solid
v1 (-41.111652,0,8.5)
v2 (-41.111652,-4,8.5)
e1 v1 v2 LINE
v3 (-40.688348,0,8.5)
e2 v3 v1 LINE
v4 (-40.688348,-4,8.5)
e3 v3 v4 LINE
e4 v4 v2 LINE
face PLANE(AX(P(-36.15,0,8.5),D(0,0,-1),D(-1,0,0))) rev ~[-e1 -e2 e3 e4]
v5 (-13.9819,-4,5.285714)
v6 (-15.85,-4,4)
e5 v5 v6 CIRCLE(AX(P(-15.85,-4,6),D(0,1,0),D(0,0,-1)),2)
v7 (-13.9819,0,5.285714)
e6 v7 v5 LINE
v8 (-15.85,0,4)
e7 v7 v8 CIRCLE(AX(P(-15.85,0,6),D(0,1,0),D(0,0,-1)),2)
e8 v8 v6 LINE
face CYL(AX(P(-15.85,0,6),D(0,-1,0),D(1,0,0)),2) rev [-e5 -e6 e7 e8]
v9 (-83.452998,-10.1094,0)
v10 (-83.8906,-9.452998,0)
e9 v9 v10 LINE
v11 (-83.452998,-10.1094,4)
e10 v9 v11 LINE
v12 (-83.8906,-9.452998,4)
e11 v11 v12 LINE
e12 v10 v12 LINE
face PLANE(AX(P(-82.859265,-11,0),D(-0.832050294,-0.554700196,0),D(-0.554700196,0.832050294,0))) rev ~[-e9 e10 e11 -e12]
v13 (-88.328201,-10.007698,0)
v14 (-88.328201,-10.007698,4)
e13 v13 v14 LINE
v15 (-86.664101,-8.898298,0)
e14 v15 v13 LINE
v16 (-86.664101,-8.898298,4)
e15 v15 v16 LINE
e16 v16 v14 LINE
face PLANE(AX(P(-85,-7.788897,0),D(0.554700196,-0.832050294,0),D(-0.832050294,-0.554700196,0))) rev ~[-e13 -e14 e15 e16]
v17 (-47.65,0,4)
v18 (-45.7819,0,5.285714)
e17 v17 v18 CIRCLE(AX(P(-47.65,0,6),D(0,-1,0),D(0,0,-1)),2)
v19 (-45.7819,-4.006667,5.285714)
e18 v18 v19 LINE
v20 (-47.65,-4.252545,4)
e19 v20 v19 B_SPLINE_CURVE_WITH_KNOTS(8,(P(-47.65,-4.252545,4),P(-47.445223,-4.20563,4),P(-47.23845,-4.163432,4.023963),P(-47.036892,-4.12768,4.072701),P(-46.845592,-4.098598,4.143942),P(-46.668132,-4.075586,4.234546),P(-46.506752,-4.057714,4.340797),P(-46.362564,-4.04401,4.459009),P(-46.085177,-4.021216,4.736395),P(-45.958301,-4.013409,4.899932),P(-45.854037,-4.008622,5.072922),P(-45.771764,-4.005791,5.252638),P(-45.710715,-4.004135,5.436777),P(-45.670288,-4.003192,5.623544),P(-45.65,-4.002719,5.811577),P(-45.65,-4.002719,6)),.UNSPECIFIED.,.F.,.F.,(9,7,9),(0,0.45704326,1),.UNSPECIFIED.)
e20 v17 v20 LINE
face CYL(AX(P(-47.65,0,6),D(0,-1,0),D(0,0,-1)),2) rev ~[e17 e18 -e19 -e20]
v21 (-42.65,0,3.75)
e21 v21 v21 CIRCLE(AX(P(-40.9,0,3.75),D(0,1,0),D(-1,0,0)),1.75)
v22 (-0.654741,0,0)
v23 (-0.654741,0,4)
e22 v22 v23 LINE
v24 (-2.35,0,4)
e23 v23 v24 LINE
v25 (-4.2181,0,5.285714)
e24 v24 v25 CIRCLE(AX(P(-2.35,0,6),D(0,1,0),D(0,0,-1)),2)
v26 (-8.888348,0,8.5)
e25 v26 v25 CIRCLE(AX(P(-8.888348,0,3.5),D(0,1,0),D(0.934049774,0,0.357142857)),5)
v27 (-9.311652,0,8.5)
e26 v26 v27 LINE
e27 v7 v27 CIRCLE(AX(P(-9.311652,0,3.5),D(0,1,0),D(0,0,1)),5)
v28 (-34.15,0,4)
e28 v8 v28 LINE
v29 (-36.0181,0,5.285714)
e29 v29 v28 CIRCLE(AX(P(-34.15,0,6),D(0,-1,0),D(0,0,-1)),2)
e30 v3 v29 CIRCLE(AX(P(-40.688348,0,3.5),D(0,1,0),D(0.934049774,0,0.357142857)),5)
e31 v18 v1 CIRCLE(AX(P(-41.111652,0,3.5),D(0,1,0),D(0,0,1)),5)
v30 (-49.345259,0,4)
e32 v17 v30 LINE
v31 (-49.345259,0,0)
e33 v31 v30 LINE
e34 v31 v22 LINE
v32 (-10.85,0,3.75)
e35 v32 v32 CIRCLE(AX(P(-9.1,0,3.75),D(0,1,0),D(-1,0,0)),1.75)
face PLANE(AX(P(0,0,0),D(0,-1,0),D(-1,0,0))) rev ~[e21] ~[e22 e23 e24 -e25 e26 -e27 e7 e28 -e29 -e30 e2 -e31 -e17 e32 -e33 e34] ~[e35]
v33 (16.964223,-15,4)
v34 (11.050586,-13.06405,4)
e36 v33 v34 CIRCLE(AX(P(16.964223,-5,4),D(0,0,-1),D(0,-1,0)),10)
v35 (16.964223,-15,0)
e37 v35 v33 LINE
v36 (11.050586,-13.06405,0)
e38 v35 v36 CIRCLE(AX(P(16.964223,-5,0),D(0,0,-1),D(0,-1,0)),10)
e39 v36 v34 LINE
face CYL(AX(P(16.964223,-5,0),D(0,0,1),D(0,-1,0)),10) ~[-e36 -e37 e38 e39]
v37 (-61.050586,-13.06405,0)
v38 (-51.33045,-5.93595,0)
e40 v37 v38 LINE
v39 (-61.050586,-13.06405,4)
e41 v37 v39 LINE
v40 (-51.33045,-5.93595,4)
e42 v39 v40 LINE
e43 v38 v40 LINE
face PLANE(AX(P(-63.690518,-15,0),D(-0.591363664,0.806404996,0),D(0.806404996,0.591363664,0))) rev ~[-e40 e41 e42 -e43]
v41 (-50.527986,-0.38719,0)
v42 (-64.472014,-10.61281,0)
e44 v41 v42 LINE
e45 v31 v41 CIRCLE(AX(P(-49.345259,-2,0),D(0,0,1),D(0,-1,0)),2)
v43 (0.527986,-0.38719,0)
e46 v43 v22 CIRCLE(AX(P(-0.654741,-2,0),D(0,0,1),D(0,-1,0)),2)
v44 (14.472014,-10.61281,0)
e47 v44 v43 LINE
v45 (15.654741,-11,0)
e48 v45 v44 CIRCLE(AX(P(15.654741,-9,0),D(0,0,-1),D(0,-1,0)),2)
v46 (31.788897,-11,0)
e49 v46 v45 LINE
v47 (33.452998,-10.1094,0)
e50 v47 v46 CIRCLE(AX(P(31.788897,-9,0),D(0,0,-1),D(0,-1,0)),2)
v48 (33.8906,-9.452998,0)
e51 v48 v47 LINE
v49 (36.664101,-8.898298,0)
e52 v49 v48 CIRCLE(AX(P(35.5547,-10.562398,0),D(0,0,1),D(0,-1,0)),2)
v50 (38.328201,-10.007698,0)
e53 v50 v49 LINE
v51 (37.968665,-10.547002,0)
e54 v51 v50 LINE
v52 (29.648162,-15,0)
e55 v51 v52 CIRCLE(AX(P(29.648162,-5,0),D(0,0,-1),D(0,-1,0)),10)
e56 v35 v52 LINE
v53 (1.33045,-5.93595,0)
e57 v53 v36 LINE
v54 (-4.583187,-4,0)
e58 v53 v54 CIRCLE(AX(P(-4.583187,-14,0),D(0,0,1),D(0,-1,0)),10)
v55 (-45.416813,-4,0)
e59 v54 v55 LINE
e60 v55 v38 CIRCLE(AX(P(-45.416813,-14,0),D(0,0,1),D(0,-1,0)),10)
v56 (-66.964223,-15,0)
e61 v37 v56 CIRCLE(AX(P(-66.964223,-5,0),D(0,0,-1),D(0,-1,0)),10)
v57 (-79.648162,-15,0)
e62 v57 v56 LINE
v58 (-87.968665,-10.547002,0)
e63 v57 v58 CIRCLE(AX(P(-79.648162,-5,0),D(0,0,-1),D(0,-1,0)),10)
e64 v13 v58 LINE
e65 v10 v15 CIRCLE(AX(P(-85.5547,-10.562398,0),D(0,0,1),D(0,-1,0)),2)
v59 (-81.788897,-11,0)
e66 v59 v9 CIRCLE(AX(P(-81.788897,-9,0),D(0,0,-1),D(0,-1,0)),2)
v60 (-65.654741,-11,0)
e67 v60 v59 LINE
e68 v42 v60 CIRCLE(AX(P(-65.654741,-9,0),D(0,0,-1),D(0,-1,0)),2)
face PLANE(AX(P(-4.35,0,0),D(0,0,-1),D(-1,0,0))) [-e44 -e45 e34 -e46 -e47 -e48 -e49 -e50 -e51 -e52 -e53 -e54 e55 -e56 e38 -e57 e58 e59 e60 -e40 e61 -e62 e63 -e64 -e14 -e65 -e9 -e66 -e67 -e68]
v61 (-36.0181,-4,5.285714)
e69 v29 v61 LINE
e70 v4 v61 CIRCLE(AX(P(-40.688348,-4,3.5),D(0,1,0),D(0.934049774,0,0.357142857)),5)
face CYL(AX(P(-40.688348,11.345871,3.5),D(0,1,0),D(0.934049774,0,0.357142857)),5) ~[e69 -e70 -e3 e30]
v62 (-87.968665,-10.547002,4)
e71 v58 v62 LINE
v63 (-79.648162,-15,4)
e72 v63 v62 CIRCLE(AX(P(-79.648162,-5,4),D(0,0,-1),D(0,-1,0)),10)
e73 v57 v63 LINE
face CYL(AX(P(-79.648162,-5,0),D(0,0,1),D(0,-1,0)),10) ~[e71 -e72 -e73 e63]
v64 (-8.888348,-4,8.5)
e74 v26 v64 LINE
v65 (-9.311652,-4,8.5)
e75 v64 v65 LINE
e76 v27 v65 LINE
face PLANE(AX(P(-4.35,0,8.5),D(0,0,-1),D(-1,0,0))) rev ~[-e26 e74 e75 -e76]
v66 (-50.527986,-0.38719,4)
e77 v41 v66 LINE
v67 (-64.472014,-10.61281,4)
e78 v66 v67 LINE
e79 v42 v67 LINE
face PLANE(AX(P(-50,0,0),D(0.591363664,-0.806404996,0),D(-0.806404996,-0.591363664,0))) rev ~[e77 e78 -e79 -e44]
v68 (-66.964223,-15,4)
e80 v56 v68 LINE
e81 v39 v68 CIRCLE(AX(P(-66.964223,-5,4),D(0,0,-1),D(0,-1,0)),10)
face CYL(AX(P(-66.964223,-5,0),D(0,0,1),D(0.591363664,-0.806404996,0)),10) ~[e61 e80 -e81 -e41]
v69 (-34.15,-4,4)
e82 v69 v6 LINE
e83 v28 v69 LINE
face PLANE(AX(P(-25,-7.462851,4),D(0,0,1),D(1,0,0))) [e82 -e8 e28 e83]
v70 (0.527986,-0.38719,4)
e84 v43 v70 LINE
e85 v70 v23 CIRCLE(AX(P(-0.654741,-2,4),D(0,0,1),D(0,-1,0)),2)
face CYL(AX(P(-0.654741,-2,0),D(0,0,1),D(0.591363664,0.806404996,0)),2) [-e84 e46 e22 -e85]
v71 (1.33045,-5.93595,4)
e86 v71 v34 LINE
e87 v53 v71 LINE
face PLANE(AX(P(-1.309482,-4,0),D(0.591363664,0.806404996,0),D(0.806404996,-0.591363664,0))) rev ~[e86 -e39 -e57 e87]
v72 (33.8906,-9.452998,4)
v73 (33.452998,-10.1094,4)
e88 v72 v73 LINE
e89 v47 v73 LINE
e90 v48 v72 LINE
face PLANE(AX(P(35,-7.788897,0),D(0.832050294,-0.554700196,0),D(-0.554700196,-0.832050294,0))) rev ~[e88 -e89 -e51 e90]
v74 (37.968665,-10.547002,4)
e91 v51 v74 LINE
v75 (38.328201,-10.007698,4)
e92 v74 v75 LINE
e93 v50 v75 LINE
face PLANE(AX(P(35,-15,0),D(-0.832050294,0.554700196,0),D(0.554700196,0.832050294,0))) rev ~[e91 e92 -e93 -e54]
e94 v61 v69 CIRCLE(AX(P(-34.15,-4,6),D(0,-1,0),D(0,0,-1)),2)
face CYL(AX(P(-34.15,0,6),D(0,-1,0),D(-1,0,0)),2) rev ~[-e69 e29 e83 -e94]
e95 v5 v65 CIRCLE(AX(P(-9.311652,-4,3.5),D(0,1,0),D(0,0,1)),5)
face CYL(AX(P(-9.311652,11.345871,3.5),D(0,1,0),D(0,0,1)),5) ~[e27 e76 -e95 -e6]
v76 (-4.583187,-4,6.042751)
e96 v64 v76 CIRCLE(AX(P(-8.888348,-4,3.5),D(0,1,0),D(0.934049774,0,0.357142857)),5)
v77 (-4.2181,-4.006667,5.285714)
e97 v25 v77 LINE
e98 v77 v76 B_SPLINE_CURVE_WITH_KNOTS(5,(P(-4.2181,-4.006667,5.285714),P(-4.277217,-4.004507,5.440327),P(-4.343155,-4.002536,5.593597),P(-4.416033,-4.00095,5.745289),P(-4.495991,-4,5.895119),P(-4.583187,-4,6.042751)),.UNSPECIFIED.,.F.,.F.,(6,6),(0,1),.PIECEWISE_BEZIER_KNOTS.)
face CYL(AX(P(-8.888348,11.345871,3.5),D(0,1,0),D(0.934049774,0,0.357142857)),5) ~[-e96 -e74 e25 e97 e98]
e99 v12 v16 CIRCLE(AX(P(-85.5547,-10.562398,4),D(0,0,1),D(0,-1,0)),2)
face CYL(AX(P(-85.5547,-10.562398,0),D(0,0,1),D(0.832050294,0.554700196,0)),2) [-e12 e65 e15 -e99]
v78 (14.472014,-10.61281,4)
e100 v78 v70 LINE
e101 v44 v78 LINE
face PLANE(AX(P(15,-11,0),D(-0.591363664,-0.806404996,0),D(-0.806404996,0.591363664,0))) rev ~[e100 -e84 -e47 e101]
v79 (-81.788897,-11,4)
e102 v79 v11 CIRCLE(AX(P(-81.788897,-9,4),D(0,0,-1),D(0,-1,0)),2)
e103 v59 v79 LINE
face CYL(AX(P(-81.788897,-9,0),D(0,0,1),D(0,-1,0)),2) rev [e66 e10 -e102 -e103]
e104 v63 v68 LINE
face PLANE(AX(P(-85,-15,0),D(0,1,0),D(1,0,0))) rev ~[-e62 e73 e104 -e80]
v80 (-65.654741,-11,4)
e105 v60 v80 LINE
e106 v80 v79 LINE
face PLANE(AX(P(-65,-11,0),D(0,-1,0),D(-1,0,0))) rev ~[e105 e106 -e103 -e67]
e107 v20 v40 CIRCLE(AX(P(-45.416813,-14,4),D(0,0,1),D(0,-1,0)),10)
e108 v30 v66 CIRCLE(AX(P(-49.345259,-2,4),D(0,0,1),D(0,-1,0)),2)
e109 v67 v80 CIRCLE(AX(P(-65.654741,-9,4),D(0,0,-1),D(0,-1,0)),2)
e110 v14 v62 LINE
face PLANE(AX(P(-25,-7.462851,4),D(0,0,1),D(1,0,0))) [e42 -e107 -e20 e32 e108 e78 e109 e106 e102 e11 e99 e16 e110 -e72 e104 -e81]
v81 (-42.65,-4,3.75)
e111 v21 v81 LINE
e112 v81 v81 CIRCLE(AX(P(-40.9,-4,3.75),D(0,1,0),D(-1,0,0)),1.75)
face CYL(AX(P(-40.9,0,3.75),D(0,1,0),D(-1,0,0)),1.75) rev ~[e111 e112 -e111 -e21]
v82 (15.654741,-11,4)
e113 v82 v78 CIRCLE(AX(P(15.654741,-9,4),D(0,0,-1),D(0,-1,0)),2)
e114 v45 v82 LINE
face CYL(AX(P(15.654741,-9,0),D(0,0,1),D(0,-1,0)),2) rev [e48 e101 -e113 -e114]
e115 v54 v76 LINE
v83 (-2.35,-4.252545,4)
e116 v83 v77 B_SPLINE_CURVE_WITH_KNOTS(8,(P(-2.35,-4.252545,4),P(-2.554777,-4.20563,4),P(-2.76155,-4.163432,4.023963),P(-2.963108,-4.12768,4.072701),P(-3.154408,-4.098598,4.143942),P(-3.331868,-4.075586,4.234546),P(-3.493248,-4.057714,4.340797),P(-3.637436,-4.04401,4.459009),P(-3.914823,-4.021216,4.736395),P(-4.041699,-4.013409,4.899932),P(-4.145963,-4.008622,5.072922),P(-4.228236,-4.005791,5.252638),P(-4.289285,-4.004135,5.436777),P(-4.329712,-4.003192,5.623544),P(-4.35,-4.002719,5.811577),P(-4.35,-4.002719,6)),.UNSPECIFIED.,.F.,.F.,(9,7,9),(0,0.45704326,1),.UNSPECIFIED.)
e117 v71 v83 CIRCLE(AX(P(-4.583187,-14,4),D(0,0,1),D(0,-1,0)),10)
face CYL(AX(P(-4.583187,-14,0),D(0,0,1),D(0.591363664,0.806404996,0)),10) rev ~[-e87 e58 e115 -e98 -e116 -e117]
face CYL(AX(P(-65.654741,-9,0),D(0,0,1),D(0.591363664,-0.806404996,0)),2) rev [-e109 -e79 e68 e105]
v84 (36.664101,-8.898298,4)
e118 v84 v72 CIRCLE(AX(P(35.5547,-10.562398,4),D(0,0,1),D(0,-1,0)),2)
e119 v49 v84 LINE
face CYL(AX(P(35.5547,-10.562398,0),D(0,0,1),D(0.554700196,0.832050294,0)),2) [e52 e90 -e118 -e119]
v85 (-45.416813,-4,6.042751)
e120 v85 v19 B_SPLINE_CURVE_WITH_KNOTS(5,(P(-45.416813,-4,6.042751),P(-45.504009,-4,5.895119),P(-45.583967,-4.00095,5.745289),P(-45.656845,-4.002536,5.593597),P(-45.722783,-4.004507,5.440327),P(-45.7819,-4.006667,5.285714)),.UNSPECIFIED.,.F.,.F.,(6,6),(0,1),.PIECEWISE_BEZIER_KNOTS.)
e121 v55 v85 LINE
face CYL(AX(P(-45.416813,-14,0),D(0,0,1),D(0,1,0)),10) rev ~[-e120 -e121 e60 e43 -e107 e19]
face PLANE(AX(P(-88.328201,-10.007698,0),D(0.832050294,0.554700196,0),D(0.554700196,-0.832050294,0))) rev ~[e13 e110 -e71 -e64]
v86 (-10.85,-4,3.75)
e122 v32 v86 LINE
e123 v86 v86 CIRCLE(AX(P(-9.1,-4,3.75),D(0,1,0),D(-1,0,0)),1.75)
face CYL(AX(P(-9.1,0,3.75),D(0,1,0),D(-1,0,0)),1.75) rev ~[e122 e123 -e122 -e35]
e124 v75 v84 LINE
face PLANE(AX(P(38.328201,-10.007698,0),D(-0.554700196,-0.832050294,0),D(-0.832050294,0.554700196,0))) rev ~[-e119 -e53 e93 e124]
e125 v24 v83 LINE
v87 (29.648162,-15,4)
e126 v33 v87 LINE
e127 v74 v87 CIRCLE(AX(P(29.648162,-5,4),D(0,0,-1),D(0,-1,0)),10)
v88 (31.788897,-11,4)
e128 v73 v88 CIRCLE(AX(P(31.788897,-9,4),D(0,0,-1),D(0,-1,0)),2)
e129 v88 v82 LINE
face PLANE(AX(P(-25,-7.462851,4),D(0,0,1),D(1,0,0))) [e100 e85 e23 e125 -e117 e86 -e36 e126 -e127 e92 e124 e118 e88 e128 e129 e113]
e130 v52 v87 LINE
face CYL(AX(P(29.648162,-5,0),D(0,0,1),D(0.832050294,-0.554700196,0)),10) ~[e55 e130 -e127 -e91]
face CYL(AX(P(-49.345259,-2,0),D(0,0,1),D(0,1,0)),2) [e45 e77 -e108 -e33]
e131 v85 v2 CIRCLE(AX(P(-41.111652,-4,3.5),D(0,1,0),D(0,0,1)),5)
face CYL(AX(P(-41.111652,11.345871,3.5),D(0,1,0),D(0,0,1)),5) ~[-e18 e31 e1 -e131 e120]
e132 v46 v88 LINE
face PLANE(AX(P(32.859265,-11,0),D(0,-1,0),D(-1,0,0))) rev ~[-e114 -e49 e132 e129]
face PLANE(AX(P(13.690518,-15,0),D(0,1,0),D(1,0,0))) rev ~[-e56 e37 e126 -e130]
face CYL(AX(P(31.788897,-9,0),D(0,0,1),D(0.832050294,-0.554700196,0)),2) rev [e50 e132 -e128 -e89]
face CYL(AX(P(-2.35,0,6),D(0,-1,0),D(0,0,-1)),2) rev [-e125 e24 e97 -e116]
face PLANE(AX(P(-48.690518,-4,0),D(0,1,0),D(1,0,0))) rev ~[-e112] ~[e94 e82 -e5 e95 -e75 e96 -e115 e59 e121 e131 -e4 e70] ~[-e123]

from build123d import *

# Parameters (mm, degrees)
F1_DEPTH    = 4
F2_W        = 9.5
F2_H        = 8.5
F3_DEPTH    = 4
F4_R        = 1.75
F5_DEPTH    = 154
F6_R        = 10
F7_R        = 2
F8_R        = 2
F9_T1_DEPTH = 26.6944612474
F9_T3_DEPTH = 26.6917420766


# Not quite as in the source:
# - a fillet or chamfer that OpenCascade refuses, or shapes differently, is made with other operations: its cross-section is extruded or revolved along the edge and cut away or added
# - an extrude ends at something that could not be found from the text; its depth is read off the source's solid


with BuildPart() as f1:
    # F0 (on Top) → F1 (new body)
    with BuildSketch(Plane.XY):
        Polygon((-82.859264966, -11), (-85, -7.7888974491), (-88.3282011774, -10.007698234), (-85, -15), (-63.6905180954, -15), (-48.6905180954, -4), (-1.3094819046, -4), (13.6905180954, -15), (35, -15), (38.3282011774, -10.007698234), (35, -7.7888974491), (32.859264966, -11), (15, -11), (0, 0), (-50, 0), (-65, -11), align=None)
    extrude(amount=F1_DEPTH)

    # F2 (on face) → F3 (join, through all)
    with BuildSketch(Plane(origin=(0, 0, 0), x_dir=(-1, 0, 0), z_dir=(0, 1, 0))):
        with Locations((9.1, 4.25)):
            Rectangle(F2_W, F2_H)
        with Locations((40.9, 4.25)):
            Rectangle(F2_W, F2_H)
    extrude(amount=-F3_DEPTH)

    # F4 (on face) → F5 (cut, through all)
    with BuildSketch(Plane(origin=(0, 0, 0), x_dir=(-1, 0, 0), z_dir=(0, 1, 0))):
        with Locations((9.1, 3.75)):
            Circle(F4_R)
        with Locations((40.9, 3.75)):
            Circle(F4_R)
    extrude(amount=-F5_DEPTH, mode=Mode.SUBTRACT)

    # F6
    f6_edges = [f1.edges().sort_by_distance(p)[0] for p in [
        (35, -15, 2),
        (13.690518, -15, 2),
        (-63.690518, -15, 2),
        (-85, -15, 2),
        (-48.690518, -4, 2),
        (-1.309482, -4, 2),
    ]]
    fillet(f6_edges, radius=F6_R)

    # F7
    f7_edges = [f1.edges().sort_by_distance(p)[0] for p in [
        (35, -7.788897, 2),
        (-85, -7.788897, 2),
        (-65, -11, 2),
        (-82.859265, -11, 2),
        (32.859265, -11, 2),
        (15, -11, 2),
        (0, 0, 2),
        (-50, 0, 2),
    ]]
    fillet(f7_edges, radius=F7_R)

    # F8
    f8_edges = [f1.edges().sort_by_distance(p)[0] for p in [
        (-45.65, -2.00136, 4),
        (-13.85, -2, 4),
        (-4.35, -2.00136, 4),
        (-36.15, -2, 4),
    ]]
    fillet(f8_edges, radius=F8_R)

    # F9: fillet of radius 5 on 4 edges, made by hand

    # F9_s2 → F9_t1 (cut)
    with BuildSketch(Plane.XZ.offset(-11.3458710383)):
        with BuildLine():
            ThreePointArc((-41.1116515847, 8.5), (-43.9463851322, 7.6187723552), (-45.7819004528, 5.2857142857))
            Line((-45.7819004528, 5.2857142857), (-46.2489253396, 5.4642857143))
            ThreePointArc((-46.2489253396, 5.4642857143), (-46.15, 6), (-46.15, 8.5))
            Line((-46.15, 8.5), (-45.65, 9))
            Line((-45.65, 9), (-41.1116515847, 9))
            Line((-41.1116515847, 9), (-41.1116515847, 8.5))
        make_face()
        with BuildLine():
            ThreePointArc((-4.2180995472, 5.2857142857), (-6.0536148677, 7.6187723552), (-8.8883484153, 8.5))
            Line((-8.8883484153, 8.5), (-8.8883484153, 9))
            Line((-8.8883484153, 9), (-4.35, 9))
            Line((-4.35, 9), (-3.85, 8.5))
            ThreePointArc((-3.85, 8.5), (-3.85, 6), (-3.7510746604, 5.4642857143))
            Line((-3.7510746604, 5.4642857143), (-4.2180995472, 5.2857142857))
        make_face()
    extrude(amount=F9_T1_DEPTH, mode=Mode.SUBTRACT)

    # F9_s4 → F9_t3 (cut)
    with BuildSketch(Plane.XZ.offset(-11.3458710383)):
        with BuildLine():
            ThreePointArc((-36.0180995472, 5.2857142857), (-37.8536148677, 7.6187723552), (-40.6883484153, 8.5))
            Line((-40.6883484153, 8.5), (-40.6883484153, 9))
            Line((-40.6883484153, 9), (-36.15, 9))
            Line((-36.15, 9), (-35.65, 8.5))
            ThreePointArc((-35.65, 8.5), (-35.65, 6), (-35.5510746604, 5.4642857143))
            Line((-35.5510746604, 5.4642857143), (-36.0180995472, 5.2857142857))
        make_face()
        with BuildLine():
            ThreePointArc((-9.3116515847, 8.5), (-12.1463851322, 7.6187723552), (-13.9819004528, 5.2857142857))
            Line((-13.9819004528, 5.2857142857), (-14.4489253396, 5.4642857143))
            ThreePointArc((-14.4489253396, 5.4642857143), (-14.35, 6), (-14.35, 8.5))
            Line((-14.35, 8.5), (-13.85, 9))
            Line((-13.85, 9), (-9.3116515847, 9))
            Line((-9.3116515847, 9), (-9.3116515847, 8.5))
        make_face()
    extrude(amount=F9_T3_DEPTH, mode=Mode.SUBTRACT)


solid = f1.part
